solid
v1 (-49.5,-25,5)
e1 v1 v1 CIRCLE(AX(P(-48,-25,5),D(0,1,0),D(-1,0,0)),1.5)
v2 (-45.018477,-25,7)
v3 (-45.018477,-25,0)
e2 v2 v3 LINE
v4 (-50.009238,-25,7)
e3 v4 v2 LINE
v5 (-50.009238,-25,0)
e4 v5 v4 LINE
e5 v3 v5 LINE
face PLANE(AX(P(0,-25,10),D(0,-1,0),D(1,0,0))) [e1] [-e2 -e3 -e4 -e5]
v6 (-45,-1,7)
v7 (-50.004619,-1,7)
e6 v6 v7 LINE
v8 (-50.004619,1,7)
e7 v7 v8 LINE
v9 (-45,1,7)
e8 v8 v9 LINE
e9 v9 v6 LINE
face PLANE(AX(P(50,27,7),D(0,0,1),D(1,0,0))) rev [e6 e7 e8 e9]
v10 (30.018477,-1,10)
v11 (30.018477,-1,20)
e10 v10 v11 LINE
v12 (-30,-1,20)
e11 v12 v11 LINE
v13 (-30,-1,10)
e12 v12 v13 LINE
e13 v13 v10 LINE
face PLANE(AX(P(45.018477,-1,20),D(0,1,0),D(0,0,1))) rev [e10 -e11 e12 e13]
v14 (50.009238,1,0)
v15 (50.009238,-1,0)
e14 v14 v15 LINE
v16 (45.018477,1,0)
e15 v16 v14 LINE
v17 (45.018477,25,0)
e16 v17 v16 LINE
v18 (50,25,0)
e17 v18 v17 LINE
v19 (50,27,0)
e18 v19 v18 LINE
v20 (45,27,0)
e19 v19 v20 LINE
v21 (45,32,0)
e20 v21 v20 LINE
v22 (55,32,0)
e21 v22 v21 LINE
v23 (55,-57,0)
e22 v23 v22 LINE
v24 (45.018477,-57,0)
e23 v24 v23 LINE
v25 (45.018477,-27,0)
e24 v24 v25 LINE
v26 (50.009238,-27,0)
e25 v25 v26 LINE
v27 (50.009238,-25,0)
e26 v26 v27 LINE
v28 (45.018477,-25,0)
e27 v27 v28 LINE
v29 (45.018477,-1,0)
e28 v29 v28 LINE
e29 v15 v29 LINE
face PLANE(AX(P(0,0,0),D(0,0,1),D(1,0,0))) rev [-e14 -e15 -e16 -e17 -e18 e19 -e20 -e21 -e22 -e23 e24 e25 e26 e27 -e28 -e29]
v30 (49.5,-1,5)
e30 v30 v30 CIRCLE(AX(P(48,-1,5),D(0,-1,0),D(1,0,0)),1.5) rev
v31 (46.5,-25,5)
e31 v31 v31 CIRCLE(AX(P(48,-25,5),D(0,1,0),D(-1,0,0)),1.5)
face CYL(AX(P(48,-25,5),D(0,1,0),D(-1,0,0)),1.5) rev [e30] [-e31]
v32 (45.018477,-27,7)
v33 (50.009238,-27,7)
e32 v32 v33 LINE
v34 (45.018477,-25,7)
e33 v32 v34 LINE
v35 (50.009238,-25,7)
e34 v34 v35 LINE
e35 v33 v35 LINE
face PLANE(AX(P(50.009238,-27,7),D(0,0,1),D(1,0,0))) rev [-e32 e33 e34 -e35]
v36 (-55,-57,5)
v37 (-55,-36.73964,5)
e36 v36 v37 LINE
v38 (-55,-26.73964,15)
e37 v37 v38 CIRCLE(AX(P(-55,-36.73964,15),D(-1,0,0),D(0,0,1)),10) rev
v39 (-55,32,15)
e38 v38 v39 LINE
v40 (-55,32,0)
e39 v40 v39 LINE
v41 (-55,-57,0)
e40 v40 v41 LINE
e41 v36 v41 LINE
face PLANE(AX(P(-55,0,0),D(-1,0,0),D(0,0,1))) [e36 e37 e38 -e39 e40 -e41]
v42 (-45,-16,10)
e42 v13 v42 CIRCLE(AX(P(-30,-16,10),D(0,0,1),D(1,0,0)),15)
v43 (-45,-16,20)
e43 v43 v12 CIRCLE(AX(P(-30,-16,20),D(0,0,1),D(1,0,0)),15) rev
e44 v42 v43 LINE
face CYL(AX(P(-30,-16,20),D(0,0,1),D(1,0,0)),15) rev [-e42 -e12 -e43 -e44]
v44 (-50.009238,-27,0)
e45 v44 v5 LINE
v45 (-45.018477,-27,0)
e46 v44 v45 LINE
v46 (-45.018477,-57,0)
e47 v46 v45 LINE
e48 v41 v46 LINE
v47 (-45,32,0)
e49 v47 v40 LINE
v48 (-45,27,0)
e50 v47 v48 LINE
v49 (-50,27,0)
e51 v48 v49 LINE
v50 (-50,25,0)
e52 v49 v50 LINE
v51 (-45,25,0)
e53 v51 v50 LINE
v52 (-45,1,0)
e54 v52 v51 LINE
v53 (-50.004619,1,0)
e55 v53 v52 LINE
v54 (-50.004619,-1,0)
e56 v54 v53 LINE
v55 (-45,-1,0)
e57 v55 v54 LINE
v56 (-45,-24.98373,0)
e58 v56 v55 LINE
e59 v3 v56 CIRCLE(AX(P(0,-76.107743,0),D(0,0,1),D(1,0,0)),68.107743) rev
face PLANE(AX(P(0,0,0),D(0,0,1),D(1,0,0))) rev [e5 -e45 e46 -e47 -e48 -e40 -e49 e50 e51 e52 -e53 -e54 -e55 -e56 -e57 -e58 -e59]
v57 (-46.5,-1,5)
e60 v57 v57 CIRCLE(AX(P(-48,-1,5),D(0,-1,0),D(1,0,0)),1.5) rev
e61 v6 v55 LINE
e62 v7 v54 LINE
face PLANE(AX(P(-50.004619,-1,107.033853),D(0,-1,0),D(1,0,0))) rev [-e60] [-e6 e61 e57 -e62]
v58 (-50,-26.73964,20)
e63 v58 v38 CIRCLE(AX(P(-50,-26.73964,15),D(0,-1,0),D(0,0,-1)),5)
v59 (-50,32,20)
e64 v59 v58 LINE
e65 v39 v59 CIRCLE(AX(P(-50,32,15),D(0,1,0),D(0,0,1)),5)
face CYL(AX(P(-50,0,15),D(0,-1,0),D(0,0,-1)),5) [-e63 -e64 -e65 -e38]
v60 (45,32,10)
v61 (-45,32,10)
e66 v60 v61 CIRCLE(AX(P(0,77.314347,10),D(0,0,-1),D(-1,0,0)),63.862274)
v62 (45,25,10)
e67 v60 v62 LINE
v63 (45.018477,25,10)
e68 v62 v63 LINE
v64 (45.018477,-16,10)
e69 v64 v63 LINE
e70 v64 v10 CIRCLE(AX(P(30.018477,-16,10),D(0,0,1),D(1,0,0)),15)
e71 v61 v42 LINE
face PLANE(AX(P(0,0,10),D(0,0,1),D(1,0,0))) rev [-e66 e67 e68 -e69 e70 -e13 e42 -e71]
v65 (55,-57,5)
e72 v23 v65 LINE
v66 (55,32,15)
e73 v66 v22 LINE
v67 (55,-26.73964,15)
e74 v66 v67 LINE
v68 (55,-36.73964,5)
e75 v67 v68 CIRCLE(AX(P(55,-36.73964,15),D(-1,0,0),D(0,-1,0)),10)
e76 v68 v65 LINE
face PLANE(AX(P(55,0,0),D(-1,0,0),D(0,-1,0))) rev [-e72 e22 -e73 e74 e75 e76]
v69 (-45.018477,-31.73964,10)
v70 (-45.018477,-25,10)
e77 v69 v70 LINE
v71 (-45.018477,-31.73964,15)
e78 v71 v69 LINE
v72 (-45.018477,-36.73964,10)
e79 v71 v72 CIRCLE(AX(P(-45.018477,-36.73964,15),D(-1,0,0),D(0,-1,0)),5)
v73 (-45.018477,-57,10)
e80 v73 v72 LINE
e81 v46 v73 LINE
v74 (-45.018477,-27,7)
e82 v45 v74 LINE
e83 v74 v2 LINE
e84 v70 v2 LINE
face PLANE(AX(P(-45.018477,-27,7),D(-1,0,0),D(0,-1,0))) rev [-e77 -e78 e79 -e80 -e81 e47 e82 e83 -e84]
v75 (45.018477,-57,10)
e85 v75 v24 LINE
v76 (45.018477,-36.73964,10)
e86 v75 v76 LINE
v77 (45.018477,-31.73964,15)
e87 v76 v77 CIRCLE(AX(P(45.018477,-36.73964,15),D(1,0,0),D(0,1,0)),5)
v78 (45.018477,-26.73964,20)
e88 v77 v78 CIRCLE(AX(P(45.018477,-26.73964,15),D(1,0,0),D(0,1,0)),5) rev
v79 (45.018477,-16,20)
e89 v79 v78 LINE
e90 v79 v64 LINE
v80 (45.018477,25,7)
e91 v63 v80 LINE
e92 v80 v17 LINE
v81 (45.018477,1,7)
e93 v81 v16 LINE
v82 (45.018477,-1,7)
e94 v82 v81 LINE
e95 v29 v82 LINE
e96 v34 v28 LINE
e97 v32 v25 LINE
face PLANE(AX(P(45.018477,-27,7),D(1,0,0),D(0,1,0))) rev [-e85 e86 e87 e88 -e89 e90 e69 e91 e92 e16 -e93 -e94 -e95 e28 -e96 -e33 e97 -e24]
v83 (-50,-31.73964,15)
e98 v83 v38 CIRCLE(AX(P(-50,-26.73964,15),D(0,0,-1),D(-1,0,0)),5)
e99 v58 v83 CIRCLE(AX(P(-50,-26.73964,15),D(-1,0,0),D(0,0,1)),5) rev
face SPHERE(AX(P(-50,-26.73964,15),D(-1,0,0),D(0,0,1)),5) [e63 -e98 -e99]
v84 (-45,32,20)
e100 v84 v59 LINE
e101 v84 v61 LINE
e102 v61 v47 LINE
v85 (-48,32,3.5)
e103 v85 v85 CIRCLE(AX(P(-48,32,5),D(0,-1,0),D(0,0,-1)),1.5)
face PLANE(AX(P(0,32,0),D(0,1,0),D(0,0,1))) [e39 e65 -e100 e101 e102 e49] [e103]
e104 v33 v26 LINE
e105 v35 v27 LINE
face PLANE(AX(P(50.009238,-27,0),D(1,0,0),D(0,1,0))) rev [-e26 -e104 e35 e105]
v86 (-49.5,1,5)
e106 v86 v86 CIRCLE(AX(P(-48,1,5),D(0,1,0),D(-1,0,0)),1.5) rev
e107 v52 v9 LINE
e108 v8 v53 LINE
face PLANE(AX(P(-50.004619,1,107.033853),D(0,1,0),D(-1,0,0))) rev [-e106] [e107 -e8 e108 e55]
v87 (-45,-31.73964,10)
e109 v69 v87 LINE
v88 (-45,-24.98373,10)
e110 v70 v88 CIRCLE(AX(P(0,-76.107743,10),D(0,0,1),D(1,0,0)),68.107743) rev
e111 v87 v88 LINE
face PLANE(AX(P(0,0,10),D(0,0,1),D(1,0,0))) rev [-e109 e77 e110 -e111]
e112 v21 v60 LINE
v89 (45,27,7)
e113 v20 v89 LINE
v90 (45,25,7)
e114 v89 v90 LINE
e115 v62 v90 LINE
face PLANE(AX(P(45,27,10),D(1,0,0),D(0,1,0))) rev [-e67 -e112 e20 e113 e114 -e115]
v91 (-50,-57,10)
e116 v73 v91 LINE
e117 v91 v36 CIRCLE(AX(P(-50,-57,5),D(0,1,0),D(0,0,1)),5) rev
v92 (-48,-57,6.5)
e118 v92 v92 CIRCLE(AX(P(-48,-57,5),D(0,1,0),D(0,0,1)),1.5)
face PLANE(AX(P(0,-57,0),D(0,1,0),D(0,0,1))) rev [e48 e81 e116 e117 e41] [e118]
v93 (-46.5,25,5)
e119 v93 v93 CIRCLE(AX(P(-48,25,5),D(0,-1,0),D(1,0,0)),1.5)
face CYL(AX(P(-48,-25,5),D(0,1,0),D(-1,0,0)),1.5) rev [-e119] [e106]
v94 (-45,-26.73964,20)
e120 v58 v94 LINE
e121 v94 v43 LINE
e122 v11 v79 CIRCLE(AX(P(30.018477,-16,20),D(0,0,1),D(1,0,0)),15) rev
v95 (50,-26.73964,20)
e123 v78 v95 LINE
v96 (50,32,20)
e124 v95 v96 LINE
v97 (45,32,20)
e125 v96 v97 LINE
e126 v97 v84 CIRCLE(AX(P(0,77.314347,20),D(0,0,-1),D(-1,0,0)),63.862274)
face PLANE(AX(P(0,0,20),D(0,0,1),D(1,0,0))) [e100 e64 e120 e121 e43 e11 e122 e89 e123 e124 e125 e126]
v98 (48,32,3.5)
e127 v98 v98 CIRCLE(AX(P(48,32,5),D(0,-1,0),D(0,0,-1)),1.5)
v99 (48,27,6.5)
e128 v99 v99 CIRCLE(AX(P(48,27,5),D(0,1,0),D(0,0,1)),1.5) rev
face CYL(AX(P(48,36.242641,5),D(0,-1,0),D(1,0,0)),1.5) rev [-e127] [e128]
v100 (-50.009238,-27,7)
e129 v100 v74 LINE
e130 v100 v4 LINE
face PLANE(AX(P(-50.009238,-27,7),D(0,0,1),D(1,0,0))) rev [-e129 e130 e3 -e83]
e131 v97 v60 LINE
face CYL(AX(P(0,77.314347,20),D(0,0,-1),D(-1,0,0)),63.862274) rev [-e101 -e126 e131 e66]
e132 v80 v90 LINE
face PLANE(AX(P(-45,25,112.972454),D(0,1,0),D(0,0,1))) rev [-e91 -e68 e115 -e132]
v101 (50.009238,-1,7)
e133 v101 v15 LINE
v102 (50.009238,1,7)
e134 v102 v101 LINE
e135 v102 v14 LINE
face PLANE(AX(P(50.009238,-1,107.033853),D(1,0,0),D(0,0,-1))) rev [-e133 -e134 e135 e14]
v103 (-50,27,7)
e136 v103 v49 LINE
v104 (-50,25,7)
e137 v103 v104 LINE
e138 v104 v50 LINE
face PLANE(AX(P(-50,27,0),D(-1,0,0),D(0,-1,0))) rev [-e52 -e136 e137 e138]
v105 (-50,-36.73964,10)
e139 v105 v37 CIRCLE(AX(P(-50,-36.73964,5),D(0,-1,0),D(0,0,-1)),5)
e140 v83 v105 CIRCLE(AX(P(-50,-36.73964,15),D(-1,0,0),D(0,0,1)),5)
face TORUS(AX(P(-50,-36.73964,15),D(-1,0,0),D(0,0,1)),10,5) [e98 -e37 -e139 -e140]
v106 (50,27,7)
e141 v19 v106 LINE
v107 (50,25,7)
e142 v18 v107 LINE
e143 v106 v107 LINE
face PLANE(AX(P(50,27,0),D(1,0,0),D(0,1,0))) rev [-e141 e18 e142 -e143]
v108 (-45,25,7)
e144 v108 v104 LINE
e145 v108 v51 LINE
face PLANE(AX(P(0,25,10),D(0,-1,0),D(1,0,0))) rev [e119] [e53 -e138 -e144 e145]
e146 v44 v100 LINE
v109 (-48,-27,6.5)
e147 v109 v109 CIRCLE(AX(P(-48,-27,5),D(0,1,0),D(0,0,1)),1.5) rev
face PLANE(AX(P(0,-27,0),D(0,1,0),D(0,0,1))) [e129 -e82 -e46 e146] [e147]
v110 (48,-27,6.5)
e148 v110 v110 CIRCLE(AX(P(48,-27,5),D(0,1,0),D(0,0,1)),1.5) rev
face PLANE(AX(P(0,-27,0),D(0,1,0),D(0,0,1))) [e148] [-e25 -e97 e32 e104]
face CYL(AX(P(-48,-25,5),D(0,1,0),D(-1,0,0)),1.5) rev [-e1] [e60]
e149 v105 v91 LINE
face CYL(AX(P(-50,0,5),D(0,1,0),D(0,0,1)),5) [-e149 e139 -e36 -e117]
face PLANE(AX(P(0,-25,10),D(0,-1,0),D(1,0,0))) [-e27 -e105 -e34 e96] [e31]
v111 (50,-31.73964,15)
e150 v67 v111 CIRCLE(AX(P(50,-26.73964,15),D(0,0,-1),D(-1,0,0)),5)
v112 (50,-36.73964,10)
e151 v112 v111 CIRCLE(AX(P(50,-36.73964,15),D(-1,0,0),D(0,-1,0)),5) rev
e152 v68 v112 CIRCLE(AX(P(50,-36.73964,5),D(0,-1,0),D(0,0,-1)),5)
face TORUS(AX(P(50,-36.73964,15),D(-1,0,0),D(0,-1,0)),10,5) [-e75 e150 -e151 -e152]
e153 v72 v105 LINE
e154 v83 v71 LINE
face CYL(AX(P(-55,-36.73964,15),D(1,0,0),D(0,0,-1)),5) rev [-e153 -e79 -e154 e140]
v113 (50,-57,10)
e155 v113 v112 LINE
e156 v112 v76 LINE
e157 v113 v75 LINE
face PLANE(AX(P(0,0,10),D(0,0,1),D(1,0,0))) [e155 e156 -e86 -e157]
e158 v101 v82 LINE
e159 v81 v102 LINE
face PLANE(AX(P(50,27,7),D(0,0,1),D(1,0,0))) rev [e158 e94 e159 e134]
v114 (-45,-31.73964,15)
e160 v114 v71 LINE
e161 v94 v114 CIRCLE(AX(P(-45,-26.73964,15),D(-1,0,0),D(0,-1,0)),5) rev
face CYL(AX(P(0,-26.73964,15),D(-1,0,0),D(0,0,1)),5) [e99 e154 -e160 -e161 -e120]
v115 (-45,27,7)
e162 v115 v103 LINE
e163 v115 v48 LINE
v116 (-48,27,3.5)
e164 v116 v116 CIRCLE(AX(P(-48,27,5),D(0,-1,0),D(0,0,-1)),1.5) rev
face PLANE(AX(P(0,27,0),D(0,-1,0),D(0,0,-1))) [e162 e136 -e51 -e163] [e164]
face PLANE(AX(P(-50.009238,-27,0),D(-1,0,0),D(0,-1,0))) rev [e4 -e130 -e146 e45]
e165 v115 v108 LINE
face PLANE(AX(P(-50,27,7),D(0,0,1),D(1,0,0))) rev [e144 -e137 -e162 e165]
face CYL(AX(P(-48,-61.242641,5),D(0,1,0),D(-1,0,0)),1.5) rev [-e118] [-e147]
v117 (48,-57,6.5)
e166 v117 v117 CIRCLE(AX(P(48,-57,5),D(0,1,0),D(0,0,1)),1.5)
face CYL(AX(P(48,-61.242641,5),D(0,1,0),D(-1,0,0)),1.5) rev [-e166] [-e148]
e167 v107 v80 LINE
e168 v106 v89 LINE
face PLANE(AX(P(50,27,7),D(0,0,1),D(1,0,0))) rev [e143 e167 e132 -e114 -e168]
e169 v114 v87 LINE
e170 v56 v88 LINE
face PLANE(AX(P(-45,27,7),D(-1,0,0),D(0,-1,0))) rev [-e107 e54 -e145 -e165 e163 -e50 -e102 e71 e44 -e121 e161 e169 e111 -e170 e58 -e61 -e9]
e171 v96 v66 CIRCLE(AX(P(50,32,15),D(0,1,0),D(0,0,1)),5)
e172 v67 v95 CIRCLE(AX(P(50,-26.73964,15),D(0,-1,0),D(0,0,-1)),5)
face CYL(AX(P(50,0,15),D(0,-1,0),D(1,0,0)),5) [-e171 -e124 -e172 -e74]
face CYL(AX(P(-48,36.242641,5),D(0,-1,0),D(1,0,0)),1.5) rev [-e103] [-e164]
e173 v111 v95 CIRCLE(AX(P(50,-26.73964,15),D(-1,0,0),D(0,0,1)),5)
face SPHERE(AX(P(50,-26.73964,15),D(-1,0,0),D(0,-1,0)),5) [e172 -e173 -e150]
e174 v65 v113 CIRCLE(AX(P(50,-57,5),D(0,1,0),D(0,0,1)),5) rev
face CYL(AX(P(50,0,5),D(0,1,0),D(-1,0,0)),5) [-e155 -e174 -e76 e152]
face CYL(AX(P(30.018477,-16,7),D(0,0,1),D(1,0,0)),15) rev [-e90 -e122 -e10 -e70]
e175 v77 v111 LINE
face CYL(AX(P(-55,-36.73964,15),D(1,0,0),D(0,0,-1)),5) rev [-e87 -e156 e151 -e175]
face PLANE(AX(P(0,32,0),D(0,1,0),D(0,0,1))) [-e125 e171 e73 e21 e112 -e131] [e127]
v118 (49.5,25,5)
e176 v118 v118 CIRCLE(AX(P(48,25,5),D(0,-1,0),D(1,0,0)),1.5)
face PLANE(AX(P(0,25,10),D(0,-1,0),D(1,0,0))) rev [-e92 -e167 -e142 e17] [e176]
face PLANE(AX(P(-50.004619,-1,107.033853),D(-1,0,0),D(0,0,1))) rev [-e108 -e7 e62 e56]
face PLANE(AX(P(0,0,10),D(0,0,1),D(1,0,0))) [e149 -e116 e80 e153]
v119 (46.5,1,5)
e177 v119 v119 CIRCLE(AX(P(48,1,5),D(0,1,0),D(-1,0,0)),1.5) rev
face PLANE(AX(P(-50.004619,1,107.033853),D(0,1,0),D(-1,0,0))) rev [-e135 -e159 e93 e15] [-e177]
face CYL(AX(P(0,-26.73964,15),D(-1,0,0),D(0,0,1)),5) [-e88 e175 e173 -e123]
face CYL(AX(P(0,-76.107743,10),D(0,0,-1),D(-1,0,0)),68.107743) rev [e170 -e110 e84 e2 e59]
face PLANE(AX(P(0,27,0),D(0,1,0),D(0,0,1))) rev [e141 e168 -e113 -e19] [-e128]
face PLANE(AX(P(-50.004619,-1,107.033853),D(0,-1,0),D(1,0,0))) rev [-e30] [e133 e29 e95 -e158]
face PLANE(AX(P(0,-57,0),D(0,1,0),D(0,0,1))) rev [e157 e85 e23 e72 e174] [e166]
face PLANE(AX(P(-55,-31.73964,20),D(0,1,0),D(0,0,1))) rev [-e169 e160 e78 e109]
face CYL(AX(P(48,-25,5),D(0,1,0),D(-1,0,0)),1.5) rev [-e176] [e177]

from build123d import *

# Parameters (mm, degrees)
BOSS_EXTRUDE1_DEPTH     = 10
CUT_EXTRUDE1_DEPTH      = 72.414284285
CUT_EXTRUDE1_DEPTH_BACK = 72.414284285
SKETCH2_R               = 1.5
SKETCH9_W               = 10
SKETCH9_H               = 50
BOSS_EXTRUDE9_DEPTH     = 5
SKETCH10_W              = 10
SKETCH10_H              = 50
BOSS_EXTRUDE10_DEPTH    = 5
BOSS_EXTRUDE11_DEPTH    = 2
SKETCH12_W              = 10
SKETCH12_H              = 10
BOSS_EXTRUDE12_DEPTH    = 5
CUT_EXTRUDE2_START      = 7
SKETCH13_R              = 1.5
CUT_EXTRUDE2_DEPTH      = 7
BOSS_EXTRUDE13_DEPTH    = 2
SKETCH15_W              = 9.981523119
SKETCH15_H              = 10
BOSS_EXTRUDE14_DEPTH    = 30
SKETCH16_R              = 1.5
CUT_EXTRUDE3_DEPTH      = 32
SKETCH17_W              = 110
SKETCH17_H              = 63.73964009
BOSS_EXTRUDE15_DEPTH    = 10
CUT_EXTRUDE4_REACH      = 83.695
SKETCH18_W              = 100.013857661
SKETCH18_H              = 2
SKETCH19_W              = 90.018476881
SKETCH19_H              = 50
CUT_EXTRUDE5_DEPTH      = 10
CUT_EXTRUDE6_DEPTH      = 80.837334625
SKETCH21_W              = 90.018476881
SKETCH21_H              = 30.73964009
CUT_EXTRUDE7_DEPTH      = 80.837334625
FILLET1_R               = 5
FILLET2_R               = 15
FILLET3_R               = 5


with BuildPart() as part:
    # Sketch1 → Boss-Extrude1 (new body)
    with BuildSketch(Plane.XY):
        with BuildLine():
            Line((45.018476881, -25), (50, -25))
            Line((50, -25), (50, 25))
            Line((50, 25), (45, 25))
            ThreePointArc((45, 25), (0, 8), (-45, 25))
            Line((-45, 25), (-50, 25))
            Line((-50, 25), (-50, -25))
            Line((-50, -25), (-45.018476881, -25))
            ThreePointArc((-45.018476881, -25), (0, -8), (45.018476881, -25))
        make_face()
    extrude(amount=BOSS_EXTRUDE1_DEPTH)

    # Sketch2 → Cut-Extrude1 (cut, two sides: drawn at the far end of the back side and taken through both)
    with BuildSketch(Plane(origin=(0, 25, 0), x_dir=(1, 0, 0), z_dir=(0, 1, 0)).offset(-CUT_EXTRUDE1_DEPTH_BACK)):
        with Locations(Location((-48, -5, 0), (0, 0, 180))):
            Circle(SKETCH2_R)
        with Locations(Location((48, -5, 0), (0, 0, 180))):
            Circle(SKETCH2_R)
    extrude(amount=CUT_EXTRUDE1_DEPTH + CUT_EXTRUDE1_DEPTH_BACK, mode=Mode.SUBTRACT)

    # Sketch9 → Boss-Extrude9 (add)
    with BuildSketch(Plane(origin=(50, 0, 0), x_dir=(0, 0, -1), z_dir=(1, 0, 0))):
        with Locations((-5, 0)):
            Rectangle(SKETCH9_W, SKETCH9_H)
    extrude(amount=BOSS_EXTRUDE9_DEPTH)

    # Sketch10 → Boss-Extrude10 (add)
    with BuildSketch(Plane.ZY.offset(50)):
        with Locations((5, 0)):
            Rectangle(SKETCH10_W, SKETCH10_H)
    extrude(amount=BOSS_EXTRUDE10_DEPTH)

    # Sketch11 → Boss-Extrude11 (add)
    with BuildSketch(Plane(origin=(0, 25, 0), x_dir=(1, 0, 0), z_dir=(0, 1, 0))):
        Polygon((50, 0), (50, -7), (45, -7), (45, -10), (55, -10), (55, 0), align=None)
        Polygon((-50, 0), (-50, -7), (-45, -7), (-45, -10), (-55, -10), (-55, 0), align=None)
    extrude(amount=BOSS_EXTRUDE11_DEPTH)

    # Sketch12 → Boss-Extrude12 (add)
    with BuildSketch(Plane(origin=(0, 27, 0), x_dir=(1, 0, 0), z_dir=(0, 1, 0))):
        with Locations((50, -5)):
            Rectangle(SKETCH12_W, SKETCH12_H)
        with Locations((-50, -5)):
            Rectangle(SKETCH12_W, SKETCH12_H)
    extrude(amount=BOSS_EXTRUDE12_DEPTH)

    # Sketch13 → Cut-Extrude2 (cut)
    with BuildSketch(Plane(origin=(0, 25, 0), x_dir=(1, 0, 0), z_dir=(0, 1, 0)).offset(CUT_EXTRUDE2_START)):
        with Locations(Location((48, -5, 0), (0, 0, 180))):
            Circle(SKETCH13_R)
        with Locations(Location((-48, -5, 0), (0, 0, 180))):
            Circle(SKETCH13_R)
    extrude(amount=-CUT_EXTRUDE2_DEPTH, mode=Mode.SUBTRACT)

    # Sketch14 → Boss-Extrude13 (add)
    with BuildSketch(Plane.XZ.offset(25)):
        Polygon((50.009238441, 0), (50.009238441, 7), (45.018476881, 7), (45.018476881, 10), (55, 10), (55, 0), align=None)
        Polygon((-50.009238441, 0), (-50.009238441, 7), (-45.018476881, 7), (-45.018476881, 10), (-55, 10), (-55, 0), align=None)
    extrude(amount=BOSS_EXTRUDE13_DEPTH)

    # Sketch15 → Boss-Extrude14 (add)
    with BuildSketch(Plane.XZ.offset(27)):
        with Locations((-50.00923844, 5)):
            Rectangle(SKETCH15_W, SKETCH15_H)
        with Locations((50.00923844, 5)):
            Rectangle(SKETCH15_W, SKETCH15_H)
    extrude(amount=BOSS_EXTRUDE14_DEPTH)

    # Sketch16 → Cut-Extrude3 (cut)
    with BuildSketch(Plane.XZ.offset(25)):
        with Locations(Location((48, 5, 0), (0, 0, 180))):
            Circle(SKETCH16_R)
        with Locations(Location((-48, 5, 0), (0, 0, 180))):
            Circle(SKETCH16_R)
    extrude(amount=CUT_EXTRUDE3_DEPTH, mode=Mode.SUBTRACT)

    # Sketch17 → Boss-Extrude15 (add)
    with BuildSketch(Plane.XY.offset(10)):
        with Locations((0, 0.130179955)):
            Rectangle(SKETCH17_W, SKETCH17_H)
    extrude(amount=BOSS_EXTRUDE15_DEPTH)

    # Cut-Extrude4: up to this face of the body (flat: up to its plane)
    cut_extrude4_end = Plane(part.part.faces().sort_by_distance((47.5, 26, 7))[0])
    # Sketch18 → Cut-Extrude4 (cut, up to the picked face)
    with BuildSketch(Plane(origin=(0, 0, 0), x_dir=(-1, 0, 0), z_dir=(0, 0, -1)), mode=Mode.PRIVATE) as cut_extrude4_sk1:
        with Locations((-0.00230961, 0)):
            Rectangle(SKETCH18_W, SKETCH18_H)
    cut_extrude4_tool1 = split(extrude(cut_extrude4_sk1.sketch, amount=-CUT_EXTRUDE4_REACH, mode=Mode.PRIVATE), bisect_by=cut_extrude4_end, keep=Keep.BOTH, mode=Mode.PRIVATE)
    add(cut_extrude4_tool1.solids().sort_by(Axis((0.00231, 0, 0), (0, 0, 1)))[0], mode=Mode.SUBTRACT)

    # Sketch19 → Cut-Extrude5 (cut)
    with BuildSketch(Plane(origin=(0, 0, 0), x_dir=(-1, 0, 0), z_dir=(0, 0, -1))):
        with Locations((-0.009238441, 0)):
            Rectangle(SKETCH19_W, SKETCH19_H)
    extrude(amount=-CUT_EXTRUDE5_DEPTH, mode=Mode.SUBTRACT)

    # Sketch20 → Cut-Extrude6 (cut, through all)
    with BuildSketch(Plane(origin=(0, 0, 10), x_dir=(-1, 0, 0), z_dir=(0, 0, -1))):
        with BuildLine():
            Line((-45, 32), (45, 32))
            ThreePointArc((45, 32), (0, 13.452072887), (-45, 32))
        make_face()
    extrude(amount=-CUT_EXTRUDE6_DEPTH, mode=Mode.SUBTRACT)

    # Sketch21 → Cut-Extrude7 (cut, through all)
    with BuildSketch(Plane(origin=(0, 0, 10), x_dir=(-1, 0, 0), z_dir=(0, 0, -1))):
        with Locations((-0.009238441, -16.369820045)):
            Rectangle(SKETCH21_W, SKETCH21_H)
    extrude(amount=-CUT_EXTRUDE7_DEPTH, mode=Mode.SUBTRACT)

    # Fillet1
    fillet1_edges = [part.edges().sort_by_distance(p)[0] for p in [
        (50.009238441, -31.73964009, 20),
        (50.009238441, -31.73964009, 10),
        (-50, -31.73964009, 20),
        (-50.009238441, -31.73964009, 10),
    ]]
    fillet(fillet1_edges, radius=FILLET1_R - 0.0001)  # a hair under: the kernel refuses the full size

    # Fillet2
    fillet2_edges = [part.edges().sort_by_distance(p)[0] for p in [
        (45.018476881, -1, 15),
        (-45, -1, 15),
    ]]
    fillet(fillet2_edges, radius=FILLET2_R)

    # Fillet3
    fillet3_edges = [part.edges().sort_by_distance(p)[0] for p in [
        (-55, 2.630129955, 20),
        (55, 2.630129955, 20),
        (55, -46.869770045, 10),
        (55, -30.275203285, 18.535563195),
        (-55, -30.275203285, 18.535563195),
        (55, -33.204076895, 11.464436805),
        (-55, -33.204076895, 11.464436805),
        (-55, -46.869770045, 10),
    ]]
    fillet(fillet3_edges, radius=FILLET3_R - 0.0001)  # a hair under: the kernel refuses the full size


solid = part.part
